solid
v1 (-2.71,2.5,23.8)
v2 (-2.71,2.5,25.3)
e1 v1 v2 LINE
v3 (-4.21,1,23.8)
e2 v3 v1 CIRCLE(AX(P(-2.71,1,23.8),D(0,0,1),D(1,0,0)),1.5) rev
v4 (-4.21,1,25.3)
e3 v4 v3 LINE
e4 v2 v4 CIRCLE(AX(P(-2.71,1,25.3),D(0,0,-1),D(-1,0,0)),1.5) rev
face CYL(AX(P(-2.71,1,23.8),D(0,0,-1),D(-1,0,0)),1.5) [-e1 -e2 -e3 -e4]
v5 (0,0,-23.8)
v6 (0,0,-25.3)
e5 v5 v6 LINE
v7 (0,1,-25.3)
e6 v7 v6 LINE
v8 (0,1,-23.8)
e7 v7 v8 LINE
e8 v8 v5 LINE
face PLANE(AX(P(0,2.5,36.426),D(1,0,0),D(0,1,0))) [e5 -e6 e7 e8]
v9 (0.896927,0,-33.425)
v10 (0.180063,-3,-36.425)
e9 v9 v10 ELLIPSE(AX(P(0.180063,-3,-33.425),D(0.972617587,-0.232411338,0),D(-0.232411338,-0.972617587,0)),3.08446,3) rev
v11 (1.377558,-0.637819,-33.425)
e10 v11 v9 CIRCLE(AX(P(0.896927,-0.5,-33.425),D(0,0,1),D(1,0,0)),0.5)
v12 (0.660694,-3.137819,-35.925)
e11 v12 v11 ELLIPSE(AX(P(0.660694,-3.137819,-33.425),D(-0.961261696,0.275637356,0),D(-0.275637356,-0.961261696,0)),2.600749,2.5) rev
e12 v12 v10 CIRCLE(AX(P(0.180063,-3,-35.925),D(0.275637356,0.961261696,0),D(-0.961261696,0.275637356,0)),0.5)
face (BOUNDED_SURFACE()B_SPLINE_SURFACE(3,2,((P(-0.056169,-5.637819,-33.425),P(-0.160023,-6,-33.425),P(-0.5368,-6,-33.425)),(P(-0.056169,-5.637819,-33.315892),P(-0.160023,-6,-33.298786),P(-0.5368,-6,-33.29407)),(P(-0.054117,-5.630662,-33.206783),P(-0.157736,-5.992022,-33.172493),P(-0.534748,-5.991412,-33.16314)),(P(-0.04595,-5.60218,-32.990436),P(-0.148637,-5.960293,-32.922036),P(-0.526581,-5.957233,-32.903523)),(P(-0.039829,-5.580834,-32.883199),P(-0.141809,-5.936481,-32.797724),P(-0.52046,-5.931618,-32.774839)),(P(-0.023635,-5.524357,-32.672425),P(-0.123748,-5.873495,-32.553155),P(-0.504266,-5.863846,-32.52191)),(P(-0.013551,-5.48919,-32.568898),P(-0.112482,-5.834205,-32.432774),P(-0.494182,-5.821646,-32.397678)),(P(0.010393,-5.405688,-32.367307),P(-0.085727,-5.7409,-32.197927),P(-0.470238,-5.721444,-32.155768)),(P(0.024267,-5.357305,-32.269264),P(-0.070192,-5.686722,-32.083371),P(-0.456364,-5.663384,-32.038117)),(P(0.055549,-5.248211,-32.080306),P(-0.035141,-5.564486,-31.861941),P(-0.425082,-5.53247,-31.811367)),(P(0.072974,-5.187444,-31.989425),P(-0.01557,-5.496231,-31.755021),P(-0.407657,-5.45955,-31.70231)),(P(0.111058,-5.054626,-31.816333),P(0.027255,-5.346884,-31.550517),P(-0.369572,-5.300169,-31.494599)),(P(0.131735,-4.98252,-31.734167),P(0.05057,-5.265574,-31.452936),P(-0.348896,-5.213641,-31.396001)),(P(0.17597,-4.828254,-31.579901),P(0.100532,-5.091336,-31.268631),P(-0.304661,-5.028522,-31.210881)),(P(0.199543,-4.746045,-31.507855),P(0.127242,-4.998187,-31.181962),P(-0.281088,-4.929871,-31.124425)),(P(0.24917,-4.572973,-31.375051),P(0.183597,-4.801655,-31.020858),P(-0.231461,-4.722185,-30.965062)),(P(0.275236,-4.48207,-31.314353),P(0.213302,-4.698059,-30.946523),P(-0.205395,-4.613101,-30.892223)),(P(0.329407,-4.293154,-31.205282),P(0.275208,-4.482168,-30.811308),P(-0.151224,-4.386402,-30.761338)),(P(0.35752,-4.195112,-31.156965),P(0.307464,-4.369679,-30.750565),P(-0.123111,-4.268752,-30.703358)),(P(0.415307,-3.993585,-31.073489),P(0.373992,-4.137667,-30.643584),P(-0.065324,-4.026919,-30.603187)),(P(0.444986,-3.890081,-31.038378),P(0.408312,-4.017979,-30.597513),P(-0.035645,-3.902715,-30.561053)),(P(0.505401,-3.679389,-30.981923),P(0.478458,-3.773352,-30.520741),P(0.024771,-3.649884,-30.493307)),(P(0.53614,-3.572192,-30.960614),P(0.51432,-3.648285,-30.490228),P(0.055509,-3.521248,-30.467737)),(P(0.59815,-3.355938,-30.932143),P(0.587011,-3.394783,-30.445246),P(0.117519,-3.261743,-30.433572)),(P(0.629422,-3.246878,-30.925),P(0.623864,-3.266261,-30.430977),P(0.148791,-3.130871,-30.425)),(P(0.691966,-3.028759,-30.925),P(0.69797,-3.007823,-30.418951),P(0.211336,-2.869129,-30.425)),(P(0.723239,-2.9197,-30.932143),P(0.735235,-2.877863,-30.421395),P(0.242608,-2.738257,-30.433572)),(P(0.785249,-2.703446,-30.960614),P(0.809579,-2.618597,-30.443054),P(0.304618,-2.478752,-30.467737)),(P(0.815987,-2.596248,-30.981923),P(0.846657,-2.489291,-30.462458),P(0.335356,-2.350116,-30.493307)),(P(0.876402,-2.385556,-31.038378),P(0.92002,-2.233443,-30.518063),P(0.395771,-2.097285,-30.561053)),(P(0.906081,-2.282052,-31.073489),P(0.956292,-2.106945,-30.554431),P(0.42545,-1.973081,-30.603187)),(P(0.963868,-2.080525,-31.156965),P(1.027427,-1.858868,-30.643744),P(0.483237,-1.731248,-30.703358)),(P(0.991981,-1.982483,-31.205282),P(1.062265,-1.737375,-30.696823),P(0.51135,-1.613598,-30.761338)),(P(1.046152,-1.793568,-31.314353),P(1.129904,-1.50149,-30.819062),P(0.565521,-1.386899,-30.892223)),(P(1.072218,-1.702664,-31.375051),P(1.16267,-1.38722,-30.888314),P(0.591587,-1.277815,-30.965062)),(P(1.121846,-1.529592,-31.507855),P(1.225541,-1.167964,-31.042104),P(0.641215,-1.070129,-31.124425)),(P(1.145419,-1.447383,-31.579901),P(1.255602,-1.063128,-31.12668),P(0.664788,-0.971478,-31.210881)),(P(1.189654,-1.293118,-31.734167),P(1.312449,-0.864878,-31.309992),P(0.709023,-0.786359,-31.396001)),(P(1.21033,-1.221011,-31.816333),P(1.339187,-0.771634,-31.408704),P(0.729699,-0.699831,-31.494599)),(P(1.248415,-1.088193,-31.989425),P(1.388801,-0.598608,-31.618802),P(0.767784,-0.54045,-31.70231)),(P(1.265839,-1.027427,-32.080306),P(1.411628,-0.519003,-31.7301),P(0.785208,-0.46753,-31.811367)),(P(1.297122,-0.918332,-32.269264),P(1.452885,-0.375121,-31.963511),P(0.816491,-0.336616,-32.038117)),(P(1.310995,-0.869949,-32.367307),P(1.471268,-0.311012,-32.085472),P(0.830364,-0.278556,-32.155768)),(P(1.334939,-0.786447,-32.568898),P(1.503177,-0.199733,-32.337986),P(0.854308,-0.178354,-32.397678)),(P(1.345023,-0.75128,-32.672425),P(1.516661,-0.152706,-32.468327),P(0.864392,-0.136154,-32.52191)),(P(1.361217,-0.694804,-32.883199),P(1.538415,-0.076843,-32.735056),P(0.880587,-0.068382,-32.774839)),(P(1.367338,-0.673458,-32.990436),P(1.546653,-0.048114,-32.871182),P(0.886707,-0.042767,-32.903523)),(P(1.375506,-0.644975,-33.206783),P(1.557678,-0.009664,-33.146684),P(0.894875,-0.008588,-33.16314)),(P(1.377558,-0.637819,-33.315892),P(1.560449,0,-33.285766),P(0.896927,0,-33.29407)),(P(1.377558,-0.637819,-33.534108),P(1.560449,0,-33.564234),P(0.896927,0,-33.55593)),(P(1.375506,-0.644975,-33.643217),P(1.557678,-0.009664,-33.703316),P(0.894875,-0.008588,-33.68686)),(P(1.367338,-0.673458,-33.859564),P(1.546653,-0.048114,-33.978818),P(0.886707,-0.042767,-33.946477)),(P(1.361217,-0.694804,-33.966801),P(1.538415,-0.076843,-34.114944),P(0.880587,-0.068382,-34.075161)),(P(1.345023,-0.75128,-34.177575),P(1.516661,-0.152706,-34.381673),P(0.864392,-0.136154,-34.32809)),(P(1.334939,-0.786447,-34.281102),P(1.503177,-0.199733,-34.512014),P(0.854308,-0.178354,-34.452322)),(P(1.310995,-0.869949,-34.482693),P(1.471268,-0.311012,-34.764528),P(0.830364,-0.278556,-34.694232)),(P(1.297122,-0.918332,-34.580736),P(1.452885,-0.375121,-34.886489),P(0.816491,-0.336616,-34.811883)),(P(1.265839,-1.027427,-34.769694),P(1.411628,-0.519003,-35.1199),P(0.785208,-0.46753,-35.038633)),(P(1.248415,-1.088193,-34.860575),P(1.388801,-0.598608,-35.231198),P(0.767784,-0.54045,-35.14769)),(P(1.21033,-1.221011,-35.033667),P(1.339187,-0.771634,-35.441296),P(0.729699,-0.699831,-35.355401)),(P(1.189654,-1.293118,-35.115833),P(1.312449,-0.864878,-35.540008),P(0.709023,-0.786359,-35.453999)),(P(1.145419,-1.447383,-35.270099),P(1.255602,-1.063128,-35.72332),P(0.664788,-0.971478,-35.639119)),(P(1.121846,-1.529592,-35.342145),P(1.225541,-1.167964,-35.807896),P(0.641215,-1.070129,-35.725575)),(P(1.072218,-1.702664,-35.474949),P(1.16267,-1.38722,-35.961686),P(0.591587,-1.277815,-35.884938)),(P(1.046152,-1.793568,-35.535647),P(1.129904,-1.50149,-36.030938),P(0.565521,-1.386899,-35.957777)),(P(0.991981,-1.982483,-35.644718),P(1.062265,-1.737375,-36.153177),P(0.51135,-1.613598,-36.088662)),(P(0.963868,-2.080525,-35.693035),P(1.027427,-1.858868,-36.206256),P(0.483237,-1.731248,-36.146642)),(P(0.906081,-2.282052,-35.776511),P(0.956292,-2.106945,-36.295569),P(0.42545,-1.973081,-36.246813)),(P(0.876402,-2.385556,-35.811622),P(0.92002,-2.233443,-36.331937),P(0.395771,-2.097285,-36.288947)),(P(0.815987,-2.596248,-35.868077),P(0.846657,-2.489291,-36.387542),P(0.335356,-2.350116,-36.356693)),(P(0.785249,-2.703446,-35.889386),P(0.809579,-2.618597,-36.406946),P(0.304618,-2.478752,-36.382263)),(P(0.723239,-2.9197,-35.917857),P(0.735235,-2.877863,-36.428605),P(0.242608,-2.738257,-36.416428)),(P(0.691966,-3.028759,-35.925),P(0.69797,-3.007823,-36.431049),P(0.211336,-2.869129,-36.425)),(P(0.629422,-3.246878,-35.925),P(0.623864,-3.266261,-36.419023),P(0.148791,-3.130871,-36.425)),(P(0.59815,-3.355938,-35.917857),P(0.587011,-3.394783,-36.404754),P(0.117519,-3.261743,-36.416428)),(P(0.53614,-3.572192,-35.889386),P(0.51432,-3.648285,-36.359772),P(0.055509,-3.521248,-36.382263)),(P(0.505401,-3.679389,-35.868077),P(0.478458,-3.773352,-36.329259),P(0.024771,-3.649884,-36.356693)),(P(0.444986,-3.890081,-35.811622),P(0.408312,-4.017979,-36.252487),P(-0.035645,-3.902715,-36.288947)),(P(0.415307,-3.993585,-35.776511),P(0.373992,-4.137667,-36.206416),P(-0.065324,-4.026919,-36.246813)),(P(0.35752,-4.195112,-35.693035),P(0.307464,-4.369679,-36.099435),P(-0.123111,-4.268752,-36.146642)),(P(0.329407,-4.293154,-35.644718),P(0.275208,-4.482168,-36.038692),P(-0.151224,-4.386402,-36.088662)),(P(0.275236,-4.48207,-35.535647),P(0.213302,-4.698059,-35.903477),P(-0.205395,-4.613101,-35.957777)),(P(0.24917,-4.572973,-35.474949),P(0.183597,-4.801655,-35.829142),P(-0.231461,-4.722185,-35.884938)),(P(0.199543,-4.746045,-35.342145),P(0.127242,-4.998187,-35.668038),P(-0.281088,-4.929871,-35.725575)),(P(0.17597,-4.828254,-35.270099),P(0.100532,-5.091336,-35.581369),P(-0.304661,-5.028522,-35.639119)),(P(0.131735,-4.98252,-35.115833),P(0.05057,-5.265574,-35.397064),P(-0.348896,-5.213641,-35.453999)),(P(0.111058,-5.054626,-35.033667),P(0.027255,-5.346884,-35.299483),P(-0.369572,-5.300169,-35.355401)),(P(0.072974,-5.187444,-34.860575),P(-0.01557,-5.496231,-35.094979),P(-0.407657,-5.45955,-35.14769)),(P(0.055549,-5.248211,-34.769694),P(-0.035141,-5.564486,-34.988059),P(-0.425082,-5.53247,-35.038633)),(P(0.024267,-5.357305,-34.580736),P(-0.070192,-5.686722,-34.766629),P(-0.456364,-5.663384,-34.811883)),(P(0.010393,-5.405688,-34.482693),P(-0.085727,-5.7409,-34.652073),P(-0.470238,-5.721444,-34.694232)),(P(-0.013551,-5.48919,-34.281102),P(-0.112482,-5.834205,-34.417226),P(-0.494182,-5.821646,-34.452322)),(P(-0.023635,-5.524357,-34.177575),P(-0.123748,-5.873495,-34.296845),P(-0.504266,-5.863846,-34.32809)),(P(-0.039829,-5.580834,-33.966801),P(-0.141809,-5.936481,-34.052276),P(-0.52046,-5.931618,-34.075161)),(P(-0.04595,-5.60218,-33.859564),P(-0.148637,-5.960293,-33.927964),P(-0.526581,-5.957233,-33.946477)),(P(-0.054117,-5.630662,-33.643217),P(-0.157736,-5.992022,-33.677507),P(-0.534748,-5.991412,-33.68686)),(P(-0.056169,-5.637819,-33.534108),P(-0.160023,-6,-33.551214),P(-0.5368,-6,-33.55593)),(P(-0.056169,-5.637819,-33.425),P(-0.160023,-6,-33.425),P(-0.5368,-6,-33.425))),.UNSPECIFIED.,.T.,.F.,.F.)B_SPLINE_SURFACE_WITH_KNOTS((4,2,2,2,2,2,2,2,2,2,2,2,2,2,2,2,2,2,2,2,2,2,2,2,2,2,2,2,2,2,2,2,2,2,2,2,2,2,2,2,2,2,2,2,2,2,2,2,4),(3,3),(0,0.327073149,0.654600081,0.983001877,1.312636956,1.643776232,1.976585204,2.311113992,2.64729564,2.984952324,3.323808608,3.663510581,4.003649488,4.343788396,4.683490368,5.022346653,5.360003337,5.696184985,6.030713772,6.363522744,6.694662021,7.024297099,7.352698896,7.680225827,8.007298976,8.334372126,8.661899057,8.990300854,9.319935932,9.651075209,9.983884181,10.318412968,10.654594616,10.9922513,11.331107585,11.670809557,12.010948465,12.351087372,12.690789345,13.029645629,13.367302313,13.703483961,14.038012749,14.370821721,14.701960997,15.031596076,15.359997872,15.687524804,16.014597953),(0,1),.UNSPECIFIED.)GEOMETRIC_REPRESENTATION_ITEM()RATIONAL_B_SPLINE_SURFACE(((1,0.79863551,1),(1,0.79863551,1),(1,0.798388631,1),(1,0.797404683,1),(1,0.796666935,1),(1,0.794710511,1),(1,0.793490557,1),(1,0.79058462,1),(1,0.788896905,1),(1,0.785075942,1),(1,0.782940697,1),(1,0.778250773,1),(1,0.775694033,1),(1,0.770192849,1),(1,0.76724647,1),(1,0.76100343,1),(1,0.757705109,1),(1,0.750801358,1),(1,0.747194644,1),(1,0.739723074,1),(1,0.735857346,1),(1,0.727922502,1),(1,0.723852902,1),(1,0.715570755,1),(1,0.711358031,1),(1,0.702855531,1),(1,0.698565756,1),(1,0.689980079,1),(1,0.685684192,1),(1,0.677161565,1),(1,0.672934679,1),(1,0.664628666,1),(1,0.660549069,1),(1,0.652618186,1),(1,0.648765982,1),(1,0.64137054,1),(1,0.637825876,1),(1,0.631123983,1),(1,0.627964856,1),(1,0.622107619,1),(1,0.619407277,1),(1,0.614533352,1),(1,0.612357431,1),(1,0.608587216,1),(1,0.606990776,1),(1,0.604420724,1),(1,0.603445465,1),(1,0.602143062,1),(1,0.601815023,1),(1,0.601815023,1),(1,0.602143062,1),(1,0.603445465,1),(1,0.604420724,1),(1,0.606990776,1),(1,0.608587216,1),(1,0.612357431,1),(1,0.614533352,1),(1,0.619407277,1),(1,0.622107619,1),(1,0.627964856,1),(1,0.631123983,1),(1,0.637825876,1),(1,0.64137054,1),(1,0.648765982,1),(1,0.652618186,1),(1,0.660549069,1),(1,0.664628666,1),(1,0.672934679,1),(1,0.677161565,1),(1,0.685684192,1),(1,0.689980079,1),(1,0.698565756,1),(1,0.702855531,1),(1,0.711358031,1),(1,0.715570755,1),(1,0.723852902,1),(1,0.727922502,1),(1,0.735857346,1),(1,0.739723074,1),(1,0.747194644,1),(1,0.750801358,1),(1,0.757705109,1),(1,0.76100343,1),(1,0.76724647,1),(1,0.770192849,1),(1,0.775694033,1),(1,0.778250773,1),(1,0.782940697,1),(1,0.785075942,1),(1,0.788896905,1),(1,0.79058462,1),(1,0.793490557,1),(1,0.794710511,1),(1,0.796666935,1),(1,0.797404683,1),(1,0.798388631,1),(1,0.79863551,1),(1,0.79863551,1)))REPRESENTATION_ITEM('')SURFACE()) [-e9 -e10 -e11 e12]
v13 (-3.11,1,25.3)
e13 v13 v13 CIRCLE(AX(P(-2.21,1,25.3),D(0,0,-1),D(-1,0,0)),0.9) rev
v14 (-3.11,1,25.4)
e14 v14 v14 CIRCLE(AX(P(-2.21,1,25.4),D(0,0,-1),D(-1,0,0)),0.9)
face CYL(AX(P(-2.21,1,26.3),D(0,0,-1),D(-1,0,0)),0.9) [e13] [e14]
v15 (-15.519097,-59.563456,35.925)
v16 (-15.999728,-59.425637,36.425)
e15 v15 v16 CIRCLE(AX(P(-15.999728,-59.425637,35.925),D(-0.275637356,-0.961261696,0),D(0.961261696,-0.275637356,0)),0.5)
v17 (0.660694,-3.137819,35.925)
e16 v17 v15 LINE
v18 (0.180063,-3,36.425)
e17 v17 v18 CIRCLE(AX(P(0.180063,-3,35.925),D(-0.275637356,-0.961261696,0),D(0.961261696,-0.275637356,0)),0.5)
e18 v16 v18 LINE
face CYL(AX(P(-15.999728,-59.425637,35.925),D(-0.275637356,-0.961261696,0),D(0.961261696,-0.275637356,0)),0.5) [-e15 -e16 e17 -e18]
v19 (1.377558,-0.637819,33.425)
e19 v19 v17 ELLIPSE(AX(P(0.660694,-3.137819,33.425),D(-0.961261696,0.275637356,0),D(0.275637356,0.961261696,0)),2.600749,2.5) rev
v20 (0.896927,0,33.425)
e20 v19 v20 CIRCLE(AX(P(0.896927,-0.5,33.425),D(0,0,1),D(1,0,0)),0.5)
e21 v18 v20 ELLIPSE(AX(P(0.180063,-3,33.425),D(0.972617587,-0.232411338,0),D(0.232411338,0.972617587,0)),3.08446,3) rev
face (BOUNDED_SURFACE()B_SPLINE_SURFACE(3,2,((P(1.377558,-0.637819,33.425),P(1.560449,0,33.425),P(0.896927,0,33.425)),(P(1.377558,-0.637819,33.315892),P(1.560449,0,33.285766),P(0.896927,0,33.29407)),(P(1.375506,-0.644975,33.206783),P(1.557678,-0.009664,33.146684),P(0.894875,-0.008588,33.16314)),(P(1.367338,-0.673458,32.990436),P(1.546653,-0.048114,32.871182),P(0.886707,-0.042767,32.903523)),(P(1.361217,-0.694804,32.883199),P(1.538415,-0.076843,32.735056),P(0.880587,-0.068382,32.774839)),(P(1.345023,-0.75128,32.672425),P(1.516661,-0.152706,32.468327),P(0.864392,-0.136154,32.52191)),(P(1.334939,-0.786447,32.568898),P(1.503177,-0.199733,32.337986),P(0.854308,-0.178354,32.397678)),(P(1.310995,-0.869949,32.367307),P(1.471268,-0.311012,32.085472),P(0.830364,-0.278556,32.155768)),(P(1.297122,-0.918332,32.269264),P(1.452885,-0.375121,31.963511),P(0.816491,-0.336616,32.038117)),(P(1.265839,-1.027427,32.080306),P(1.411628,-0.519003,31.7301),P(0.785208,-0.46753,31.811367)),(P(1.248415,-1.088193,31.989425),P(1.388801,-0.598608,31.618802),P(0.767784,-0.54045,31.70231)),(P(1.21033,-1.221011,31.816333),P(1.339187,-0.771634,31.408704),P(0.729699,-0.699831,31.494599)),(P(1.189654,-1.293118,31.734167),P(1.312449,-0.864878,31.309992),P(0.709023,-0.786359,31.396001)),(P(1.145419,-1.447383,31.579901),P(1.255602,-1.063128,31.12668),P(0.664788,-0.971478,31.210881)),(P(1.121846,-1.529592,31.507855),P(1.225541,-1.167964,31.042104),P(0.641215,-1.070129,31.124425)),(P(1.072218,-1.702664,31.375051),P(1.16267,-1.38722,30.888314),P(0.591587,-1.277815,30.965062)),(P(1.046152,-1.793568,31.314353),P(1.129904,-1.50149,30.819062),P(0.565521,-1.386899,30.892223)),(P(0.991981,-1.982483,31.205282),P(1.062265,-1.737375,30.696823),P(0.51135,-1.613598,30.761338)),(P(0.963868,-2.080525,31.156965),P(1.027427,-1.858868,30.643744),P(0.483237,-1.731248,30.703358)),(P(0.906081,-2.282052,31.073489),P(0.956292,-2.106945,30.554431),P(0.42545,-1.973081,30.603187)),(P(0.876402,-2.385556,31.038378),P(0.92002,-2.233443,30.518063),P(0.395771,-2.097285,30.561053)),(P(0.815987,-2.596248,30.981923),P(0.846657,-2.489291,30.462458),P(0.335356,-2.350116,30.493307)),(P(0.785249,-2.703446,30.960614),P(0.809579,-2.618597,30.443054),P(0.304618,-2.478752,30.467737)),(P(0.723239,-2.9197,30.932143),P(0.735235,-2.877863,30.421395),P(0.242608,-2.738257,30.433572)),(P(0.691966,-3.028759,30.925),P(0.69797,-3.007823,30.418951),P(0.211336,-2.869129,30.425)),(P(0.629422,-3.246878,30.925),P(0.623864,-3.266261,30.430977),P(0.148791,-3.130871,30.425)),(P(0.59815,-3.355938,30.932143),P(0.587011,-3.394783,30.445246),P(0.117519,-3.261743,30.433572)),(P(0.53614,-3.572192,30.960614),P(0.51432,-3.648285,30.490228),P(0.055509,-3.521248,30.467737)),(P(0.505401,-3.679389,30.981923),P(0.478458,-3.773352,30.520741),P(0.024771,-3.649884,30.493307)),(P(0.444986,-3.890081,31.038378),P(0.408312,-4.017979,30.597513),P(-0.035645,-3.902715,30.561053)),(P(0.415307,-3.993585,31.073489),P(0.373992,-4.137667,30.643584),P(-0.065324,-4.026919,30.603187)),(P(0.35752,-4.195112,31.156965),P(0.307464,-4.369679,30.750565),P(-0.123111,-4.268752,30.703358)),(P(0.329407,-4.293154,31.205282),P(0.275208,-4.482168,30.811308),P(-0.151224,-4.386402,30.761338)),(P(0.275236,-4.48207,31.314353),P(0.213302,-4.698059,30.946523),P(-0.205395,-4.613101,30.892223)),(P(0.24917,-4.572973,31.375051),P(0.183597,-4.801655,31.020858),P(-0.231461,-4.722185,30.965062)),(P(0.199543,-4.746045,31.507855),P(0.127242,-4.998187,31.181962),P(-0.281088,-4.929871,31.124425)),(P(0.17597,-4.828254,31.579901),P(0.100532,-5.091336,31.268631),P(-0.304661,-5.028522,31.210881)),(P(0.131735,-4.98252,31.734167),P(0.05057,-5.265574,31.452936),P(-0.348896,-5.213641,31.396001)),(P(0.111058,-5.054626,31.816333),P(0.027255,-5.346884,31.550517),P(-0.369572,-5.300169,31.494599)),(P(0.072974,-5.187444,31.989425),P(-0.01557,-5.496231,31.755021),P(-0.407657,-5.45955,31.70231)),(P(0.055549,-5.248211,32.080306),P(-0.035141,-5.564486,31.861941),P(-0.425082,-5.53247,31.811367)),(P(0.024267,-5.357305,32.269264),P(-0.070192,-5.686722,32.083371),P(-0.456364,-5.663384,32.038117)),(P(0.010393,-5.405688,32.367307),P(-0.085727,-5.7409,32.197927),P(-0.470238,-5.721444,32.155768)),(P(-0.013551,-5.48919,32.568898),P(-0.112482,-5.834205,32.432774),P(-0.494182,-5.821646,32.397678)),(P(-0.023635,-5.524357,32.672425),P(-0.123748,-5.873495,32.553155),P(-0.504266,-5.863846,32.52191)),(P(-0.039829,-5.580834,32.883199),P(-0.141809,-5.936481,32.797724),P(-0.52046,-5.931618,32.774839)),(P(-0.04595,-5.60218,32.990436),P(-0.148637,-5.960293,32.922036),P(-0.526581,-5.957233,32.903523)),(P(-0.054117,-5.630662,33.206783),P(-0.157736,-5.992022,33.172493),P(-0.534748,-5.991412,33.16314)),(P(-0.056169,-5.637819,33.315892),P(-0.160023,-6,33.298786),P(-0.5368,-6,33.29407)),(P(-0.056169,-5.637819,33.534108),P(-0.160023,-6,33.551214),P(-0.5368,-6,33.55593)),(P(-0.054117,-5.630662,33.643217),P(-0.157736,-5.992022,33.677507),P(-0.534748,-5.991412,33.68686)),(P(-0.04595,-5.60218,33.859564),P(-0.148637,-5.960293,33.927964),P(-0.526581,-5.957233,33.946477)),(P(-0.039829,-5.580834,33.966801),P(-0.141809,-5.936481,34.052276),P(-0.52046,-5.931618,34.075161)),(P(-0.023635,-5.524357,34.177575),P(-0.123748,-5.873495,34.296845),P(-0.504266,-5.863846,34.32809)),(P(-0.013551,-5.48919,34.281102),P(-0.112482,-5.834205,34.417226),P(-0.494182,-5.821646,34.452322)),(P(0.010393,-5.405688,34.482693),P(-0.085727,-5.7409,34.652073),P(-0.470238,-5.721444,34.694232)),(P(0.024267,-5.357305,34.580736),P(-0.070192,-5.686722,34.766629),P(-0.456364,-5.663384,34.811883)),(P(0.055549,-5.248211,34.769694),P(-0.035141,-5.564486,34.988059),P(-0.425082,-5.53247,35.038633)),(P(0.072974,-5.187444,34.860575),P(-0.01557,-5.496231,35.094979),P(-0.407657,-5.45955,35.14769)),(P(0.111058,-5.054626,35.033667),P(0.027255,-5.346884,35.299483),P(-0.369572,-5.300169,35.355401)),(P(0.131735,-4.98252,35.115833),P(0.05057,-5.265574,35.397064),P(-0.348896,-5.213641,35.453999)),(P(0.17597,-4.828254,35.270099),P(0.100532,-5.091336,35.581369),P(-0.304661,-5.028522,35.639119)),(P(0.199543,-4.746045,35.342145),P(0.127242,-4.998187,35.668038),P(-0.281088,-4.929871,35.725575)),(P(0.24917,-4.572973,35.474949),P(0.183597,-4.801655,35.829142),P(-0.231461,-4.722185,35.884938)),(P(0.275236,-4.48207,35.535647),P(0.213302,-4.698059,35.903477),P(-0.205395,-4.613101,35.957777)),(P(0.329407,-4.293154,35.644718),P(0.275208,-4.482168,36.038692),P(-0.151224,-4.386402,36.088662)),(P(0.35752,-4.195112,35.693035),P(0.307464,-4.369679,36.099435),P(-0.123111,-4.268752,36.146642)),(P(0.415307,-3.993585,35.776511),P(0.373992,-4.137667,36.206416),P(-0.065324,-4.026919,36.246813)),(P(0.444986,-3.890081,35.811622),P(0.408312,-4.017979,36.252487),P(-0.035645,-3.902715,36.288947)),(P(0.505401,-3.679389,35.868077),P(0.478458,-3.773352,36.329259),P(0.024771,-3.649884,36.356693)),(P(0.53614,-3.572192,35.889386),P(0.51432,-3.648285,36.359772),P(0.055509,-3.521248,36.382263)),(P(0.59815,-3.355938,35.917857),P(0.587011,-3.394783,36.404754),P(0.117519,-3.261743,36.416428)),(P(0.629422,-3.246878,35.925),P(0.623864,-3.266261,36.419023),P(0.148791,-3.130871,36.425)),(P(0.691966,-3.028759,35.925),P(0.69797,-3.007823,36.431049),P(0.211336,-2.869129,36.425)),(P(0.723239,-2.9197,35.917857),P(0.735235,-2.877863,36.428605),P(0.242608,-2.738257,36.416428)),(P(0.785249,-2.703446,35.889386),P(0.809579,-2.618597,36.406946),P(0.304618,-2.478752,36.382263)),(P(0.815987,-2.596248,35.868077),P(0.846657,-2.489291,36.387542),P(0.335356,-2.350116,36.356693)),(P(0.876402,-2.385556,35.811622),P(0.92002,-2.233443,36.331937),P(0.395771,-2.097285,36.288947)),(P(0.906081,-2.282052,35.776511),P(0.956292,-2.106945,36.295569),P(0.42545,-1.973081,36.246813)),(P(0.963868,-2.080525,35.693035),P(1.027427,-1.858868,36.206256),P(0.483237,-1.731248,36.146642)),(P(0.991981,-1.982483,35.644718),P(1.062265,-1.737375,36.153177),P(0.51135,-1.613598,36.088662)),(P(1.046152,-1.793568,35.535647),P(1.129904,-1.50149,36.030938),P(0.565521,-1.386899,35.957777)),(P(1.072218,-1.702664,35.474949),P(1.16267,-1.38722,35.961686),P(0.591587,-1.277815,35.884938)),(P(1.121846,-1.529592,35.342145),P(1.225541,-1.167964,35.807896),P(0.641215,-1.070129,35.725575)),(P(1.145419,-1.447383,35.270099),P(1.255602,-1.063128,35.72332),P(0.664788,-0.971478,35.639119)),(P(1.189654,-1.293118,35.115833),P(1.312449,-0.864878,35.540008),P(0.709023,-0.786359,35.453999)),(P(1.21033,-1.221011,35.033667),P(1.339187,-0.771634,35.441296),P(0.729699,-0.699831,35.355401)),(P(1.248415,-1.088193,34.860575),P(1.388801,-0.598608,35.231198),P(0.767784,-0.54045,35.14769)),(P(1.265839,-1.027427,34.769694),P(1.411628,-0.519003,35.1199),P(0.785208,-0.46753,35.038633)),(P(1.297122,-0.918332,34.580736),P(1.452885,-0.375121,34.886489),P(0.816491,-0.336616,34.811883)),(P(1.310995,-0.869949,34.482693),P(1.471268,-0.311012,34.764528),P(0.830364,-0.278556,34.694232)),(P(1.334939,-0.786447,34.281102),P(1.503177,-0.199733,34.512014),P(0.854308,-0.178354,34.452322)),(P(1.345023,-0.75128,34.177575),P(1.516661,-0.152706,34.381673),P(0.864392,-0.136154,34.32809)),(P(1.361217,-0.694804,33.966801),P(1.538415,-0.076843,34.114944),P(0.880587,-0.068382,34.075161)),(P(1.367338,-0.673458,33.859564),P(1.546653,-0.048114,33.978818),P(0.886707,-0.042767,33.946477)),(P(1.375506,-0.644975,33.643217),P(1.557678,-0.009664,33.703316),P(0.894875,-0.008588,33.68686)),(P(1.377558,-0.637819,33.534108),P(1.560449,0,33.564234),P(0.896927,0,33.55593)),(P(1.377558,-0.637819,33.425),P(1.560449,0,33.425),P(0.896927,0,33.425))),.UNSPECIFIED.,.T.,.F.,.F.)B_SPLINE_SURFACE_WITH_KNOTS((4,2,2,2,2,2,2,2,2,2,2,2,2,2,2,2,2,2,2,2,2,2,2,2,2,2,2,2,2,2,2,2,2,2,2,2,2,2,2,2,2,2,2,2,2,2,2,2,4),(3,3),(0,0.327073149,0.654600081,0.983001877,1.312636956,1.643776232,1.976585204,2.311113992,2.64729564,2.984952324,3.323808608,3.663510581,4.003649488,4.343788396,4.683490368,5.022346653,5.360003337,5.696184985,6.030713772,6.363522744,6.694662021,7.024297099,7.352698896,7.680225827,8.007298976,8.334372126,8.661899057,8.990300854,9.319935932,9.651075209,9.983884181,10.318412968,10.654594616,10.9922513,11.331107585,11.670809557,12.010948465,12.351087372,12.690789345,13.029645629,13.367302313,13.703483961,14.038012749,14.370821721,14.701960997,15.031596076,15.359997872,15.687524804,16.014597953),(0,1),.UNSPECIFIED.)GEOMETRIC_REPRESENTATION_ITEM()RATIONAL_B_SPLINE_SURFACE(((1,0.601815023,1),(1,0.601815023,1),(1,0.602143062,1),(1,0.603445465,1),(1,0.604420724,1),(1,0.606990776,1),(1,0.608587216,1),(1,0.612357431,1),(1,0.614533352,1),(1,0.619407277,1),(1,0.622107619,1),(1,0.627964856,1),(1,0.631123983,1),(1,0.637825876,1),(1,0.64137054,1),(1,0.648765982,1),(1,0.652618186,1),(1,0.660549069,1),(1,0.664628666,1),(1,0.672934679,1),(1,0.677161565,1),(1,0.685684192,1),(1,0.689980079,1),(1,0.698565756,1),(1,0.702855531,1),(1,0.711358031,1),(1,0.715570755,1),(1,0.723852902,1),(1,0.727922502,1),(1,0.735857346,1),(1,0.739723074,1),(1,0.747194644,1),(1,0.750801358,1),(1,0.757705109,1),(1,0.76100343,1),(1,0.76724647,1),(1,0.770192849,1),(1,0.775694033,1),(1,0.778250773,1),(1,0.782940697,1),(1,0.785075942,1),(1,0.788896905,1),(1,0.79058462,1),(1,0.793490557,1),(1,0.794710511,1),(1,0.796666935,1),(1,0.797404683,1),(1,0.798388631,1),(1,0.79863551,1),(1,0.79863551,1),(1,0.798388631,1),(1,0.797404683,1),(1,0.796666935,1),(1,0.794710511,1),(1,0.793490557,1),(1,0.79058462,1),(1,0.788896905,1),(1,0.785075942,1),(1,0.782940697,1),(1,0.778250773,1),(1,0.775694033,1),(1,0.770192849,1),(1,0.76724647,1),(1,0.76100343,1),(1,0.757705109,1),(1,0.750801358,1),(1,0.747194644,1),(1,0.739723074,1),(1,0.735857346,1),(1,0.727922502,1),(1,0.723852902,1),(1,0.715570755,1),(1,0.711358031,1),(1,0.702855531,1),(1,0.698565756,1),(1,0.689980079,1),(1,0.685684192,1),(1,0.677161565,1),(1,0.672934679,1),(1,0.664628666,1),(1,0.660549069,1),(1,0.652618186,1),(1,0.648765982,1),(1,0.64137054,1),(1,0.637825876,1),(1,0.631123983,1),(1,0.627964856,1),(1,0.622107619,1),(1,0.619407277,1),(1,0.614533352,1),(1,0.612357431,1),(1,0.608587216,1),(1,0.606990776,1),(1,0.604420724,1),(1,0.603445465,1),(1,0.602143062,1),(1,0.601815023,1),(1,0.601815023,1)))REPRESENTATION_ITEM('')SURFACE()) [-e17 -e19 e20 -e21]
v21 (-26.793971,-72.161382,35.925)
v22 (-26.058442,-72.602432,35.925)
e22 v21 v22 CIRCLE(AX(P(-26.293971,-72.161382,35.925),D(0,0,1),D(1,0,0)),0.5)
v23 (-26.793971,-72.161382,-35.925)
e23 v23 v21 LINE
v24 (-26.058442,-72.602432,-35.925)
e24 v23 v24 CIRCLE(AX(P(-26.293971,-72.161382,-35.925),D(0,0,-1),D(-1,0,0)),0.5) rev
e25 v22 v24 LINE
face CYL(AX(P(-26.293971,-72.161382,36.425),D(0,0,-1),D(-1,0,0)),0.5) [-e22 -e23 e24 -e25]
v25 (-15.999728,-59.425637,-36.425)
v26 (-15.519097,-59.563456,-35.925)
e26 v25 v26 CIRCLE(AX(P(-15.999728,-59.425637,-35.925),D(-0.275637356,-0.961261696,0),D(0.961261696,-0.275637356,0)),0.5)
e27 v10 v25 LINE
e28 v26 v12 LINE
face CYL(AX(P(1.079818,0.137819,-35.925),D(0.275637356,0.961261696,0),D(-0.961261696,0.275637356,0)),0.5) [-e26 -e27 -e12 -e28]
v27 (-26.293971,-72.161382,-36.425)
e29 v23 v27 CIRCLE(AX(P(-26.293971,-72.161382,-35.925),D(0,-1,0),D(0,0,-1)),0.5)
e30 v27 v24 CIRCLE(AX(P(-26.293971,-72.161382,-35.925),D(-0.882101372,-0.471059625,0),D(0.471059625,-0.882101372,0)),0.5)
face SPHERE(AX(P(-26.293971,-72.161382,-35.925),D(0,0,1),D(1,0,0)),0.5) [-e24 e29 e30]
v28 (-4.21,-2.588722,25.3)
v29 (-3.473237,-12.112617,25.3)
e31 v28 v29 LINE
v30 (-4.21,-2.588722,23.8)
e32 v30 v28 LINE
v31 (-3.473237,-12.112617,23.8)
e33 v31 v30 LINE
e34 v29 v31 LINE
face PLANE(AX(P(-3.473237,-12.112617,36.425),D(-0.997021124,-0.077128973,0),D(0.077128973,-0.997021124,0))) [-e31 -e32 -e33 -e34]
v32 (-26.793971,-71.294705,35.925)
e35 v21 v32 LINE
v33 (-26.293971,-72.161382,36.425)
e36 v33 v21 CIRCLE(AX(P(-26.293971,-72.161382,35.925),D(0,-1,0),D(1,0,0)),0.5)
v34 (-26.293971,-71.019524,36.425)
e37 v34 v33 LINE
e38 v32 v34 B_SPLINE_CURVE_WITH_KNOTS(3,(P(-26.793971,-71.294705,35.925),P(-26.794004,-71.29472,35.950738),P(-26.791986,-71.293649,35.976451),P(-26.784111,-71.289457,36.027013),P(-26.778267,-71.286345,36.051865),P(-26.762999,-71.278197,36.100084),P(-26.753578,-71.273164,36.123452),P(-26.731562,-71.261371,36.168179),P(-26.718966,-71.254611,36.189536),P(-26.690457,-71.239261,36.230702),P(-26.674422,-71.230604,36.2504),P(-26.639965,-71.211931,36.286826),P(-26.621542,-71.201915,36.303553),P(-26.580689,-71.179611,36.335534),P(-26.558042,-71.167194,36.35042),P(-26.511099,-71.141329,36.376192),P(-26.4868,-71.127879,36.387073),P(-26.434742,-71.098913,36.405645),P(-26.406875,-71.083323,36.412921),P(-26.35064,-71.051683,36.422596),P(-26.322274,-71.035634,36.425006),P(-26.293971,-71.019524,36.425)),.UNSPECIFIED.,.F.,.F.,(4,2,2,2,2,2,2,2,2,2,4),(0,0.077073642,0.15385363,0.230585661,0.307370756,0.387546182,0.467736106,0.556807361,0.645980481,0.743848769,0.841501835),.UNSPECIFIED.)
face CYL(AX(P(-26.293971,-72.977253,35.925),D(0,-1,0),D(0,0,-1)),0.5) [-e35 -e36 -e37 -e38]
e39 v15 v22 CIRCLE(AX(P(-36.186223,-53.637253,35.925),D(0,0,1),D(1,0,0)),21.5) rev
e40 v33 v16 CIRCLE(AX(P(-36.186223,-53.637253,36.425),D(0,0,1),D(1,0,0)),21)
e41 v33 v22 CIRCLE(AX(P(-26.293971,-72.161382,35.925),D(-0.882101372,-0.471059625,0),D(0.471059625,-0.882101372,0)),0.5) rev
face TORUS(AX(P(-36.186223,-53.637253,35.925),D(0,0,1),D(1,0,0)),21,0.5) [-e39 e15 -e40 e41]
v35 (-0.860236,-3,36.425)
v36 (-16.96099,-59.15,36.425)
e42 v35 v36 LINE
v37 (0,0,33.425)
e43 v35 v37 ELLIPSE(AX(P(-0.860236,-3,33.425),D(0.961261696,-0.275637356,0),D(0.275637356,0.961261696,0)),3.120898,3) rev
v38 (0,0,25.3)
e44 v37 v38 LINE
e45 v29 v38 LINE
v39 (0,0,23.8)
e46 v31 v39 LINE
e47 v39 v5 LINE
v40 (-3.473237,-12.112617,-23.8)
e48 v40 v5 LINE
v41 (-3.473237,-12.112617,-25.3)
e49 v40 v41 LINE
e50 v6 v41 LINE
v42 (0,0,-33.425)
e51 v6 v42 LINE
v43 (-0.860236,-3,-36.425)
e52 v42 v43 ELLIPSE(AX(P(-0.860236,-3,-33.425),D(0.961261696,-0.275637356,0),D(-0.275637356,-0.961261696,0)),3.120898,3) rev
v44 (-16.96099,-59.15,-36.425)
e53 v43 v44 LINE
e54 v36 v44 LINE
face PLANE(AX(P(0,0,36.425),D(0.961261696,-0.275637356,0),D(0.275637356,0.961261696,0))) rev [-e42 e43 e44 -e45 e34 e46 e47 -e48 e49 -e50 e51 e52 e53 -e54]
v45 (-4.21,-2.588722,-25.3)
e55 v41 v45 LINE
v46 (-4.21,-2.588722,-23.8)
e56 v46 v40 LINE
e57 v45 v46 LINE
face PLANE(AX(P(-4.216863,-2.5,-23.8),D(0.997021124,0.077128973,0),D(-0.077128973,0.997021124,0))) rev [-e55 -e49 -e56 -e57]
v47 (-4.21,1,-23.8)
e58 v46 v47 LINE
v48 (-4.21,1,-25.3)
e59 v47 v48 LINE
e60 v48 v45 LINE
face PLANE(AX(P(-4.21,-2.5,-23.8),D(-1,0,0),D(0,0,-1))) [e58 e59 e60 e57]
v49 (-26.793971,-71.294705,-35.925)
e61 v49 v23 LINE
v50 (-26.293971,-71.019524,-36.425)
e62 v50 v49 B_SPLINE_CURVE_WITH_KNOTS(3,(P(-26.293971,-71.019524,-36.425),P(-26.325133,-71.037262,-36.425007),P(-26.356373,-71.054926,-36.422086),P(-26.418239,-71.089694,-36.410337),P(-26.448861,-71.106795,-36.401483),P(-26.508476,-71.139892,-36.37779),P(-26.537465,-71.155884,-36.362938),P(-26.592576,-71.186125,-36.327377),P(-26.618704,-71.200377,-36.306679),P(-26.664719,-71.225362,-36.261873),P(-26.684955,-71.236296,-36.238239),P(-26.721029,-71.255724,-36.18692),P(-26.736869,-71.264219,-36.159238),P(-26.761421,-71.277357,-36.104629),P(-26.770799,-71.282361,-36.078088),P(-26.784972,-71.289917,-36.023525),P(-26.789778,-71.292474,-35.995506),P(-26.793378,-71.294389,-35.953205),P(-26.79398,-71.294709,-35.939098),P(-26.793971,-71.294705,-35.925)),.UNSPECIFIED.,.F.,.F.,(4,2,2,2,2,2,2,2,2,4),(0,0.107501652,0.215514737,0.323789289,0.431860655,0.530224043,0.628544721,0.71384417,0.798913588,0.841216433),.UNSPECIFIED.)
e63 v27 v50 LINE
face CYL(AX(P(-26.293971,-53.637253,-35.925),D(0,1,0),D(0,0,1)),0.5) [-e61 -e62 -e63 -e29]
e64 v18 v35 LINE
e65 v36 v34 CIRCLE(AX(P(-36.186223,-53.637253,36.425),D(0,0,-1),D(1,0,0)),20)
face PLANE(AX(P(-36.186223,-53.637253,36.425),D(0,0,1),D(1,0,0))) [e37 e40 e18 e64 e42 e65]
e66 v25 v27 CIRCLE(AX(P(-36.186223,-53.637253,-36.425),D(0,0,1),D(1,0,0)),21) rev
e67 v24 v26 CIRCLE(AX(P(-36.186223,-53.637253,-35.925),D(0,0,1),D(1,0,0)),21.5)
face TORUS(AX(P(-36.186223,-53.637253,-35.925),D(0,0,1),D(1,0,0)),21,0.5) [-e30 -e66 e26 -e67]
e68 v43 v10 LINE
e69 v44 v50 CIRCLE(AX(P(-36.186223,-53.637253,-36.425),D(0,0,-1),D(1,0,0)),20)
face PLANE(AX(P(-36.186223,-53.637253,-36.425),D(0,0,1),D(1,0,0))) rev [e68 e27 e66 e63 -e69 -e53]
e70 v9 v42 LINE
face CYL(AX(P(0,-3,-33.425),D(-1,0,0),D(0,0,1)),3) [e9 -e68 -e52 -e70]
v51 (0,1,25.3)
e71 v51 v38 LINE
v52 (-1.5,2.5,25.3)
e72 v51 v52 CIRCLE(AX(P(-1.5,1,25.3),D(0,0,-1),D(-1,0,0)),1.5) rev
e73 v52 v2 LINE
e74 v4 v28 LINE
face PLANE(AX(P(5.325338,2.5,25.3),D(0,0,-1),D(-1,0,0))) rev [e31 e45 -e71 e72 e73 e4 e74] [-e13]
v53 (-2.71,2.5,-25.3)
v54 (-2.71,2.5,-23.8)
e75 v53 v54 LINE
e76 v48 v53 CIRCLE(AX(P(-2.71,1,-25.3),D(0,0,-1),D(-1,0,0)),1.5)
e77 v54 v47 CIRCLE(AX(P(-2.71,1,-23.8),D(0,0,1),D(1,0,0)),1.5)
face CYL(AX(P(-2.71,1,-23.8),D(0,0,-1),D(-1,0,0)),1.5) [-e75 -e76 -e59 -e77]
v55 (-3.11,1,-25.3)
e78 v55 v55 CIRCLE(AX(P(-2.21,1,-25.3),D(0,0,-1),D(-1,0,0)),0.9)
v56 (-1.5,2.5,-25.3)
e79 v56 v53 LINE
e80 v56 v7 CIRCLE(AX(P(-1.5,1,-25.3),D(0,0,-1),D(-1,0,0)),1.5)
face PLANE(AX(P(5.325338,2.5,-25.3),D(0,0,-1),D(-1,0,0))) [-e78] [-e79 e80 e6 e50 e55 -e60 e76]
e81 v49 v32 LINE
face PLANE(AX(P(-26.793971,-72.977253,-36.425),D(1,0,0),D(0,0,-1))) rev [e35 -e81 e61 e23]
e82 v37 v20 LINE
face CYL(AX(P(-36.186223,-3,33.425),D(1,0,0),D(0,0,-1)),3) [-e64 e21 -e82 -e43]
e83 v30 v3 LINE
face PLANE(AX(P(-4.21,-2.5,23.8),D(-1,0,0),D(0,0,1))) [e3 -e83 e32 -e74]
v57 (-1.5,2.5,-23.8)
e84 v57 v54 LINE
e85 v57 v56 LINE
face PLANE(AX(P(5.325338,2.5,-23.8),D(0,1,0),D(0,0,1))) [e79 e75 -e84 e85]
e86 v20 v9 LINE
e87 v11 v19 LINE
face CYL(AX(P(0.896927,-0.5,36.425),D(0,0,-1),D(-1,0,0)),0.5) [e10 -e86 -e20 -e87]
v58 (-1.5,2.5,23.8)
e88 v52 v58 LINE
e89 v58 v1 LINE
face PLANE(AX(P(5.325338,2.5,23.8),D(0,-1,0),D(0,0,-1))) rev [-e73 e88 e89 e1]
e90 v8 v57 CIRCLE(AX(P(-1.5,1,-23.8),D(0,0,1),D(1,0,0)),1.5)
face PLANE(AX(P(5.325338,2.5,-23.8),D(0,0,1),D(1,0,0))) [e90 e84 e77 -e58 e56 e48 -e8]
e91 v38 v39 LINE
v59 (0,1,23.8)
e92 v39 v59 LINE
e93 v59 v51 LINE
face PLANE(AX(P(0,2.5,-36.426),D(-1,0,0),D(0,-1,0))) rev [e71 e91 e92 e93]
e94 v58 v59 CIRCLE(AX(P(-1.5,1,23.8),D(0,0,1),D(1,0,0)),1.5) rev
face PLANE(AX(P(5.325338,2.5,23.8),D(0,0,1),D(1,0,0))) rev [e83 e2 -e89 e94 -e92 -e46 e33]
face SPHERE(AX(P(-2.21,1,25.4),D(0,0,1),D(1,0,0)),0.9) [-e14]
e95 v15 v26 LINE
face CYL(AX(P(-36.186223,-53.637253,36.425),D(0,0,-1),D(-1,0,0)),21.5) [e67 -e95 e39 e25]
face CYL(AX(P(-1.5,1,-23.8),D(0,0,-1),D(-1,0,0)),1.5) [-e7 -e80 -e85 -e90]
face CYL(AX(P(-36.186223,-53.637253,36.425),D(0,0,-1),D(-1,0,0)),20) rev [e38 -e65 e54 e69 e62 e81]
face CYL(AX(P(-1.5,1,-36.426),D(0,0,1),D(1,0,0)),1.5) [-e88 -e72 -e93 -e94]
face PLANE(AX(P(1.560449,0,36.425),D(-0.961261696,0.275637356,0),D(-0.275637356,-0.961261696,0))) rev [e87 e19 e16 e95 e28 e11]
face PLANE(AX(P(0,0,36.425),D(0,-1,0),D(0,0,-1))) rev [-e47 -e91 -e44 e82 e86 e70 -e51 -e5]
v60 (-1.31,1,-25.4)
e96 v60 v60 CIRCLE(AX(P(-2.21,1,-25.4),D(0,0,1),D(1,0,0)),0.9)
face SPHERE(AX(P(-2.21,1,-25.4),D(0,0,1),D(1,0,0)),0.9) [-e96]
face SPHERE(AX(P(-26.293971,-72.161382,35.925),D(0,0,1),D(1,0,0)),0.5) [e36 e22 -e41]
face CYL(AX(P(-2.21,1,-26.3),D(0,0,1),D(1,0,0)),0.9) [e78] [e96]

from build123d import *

# Parameters (mm, degrees)
BOSS_EXTRUDE1_DEPTH   = 36.425
CUT_EXTRUDE1_DEPTH    = 109.688749553
CUT_EXTRUDE2_DEPTH    = 108.700665357
FILLET1_R             = 3
BOSS_EXTRUDE12_REACH  = 92.061
BOSS_EXTRUDE12_START  = -4.21
SKETCH27_W            = 1.5
SKETCH27_H            = 5
CUT_EXTRUDE9_REACH    = 101.265
SKETCH30_W            = 0.716863464
SKETCH30_H            = 2.5
SKETCH31_R            = 0.9
BOSS_EXTRUDE13_DEPTH  = 1
FILLET9_R             = 1.5
FILLET10_R            = 1.5
FILLET11_R            = 0.9
FILLET9_OF_MIRROR4_R  = 1.5
FILLET10_OF_MIRROR4_R = 1.5
FILLET11_OF_MIRROR4_R = 0.9
FILLET12_R            = 0.5


with BuildPart() as part:
    # Sketch1 → Boss-Extrude1 (new, symmetric)
    with BuildSketch(Plane.XY):
        with BuildLine():
            Line((0, 0), (-16.960989568, -59.15))
            ThreePointArc((-16.960989568, -59.15), (-22.197903753, -67.931549335), (-31.090696036, -72.977252884))
            Line((-31.090696036, -72.977252884), (-30.708531477, -74.427752884))
            ThreePointArc((-30.708531477, -74.427752884), (-21.148779773, -69.003621568), (-15.519097024, -59.563456034))
            Line((-15.519097024, -59.563456034), (1.441892544, -0.413456034))
            Line((1.441892544, -0.413456034), (1.560449154, 0))
            Line((1.560449154, 0), (0, 0))
        make_face()
    extrude(amount=BOSS_EXTRUDE1_DEPTH, both=True)

    # Sketch2 → Cut-Extrude1 (cut, through all)
    with BuildSketch(Plane.XY.offset(36.425)):
        with BuildLine():
            Line((-31.090696036, -72.977252884), (-26.79397136, -72.977252884))
            ThreePointArc((-26.79397136, -72.977252884), (-28.715962633, -73.797739058), (-30.708531477, -74.427752884))
            Line((-30.708531477, -74.427752884), (-31.090696036, -72.977252884))
        make_face()
    extrude(amount=-CUT_EXTRUDE1_DEPTH, mode=Mode.SUBTRACT)

    # Sketch3 → Cut-Extrude2 (cut, through all)
    with BuildSketch(Plane.XY.offset(36.425)):
        with BuildLine():
            Line((-26.79397136, -72.977252884), (-31.090696036, -72.977252884))
            ThreePointArc((-31.090696036, -72.977252884), (-28.893646337, -72.260311669), (-26.79397136, -71.294704568))
            Line((-26.79397136, -71.294704568), (-26.79397136, -72.977252884))
        make_face()
    extrude(amount=-CUT_EXTRUDE2_DEPTH, mode=Mode.SUBTRACT)

    # Fillet1
    fillet1_edges = [part.edges().sort_by_distance(p)[0] for p in [
        (0.780224577, 0, 36.425),
        (0.780224577, 0, -36.425),
    ]]
    fillet(fillet1_edges, radius=FILLET1_R)

    # Boss-Extrude12: up to this plane
    boss_extrude12_end = Plane(origin=(0, 0, 36.425), z_dir=(0.961261695938318, -0.27563735581700266, 0))
    # Sketch27 → Boss-Extrude12 (add, up to the surface)
    with BuildSketch(Plane(origin=(0, 0, 0), x_dir=(0, 0, -1), z_dir=(1, 0, 0)).offset(BOSS_EXTRUDE12_START), mode=Mode.PRIVATE) as boss_extrude12_sk1:
        with Locations((-24.55, 0)):
            Rectangle(SKETCH27_W, SKETCH27_H)
    boss_extrude12_tool1 = split(extrude(boss_extrude12_sk1.sketch, amount=BOSS_EXTRUDE12_REACH, mode=Mode.PRIVATE), bisect_by=boss_extrude12_end, keep=Keep.BOTH, mode=Mode.PRIVATE)
    boss_extrude12 = boss_extrude12_tool1.solids().sort_by_distance((-4.21, 0, 24.55))[0]
    add(boss_extrude12)

    # Sketch30 → Cut-Extrude9 (cut, up to next)
    with BuildSketch(Plane.XY.offset(25.3), mode=Mode.PRIVATE) as cut_extrude9_sk1:
        with Locations((0.358431732, 1.25)):
            Rectangle(SKETCH30_W, SKETCH30_H)
    cut_extrude9_tool1 = extrude(cut_extrude9_sk1.sketch, amount=-CUT_EXTRUDE9_REACH, mode=Mode.PRIVATE) & part.part
    cut_extrude9 = cut_extrude9_tool1.solids().sort_by_distance((0.358432, 1.25, 25.3))[0]
    add(cut_extrude9, mode=Mode.SUBTRACT)

    # Sketch31 → Boss-Extrude13 (add)
    with BuildSketch(Plane.XY.offset(25.3)):
        with Locations(Location((-2.21, 1, 0), (0, 0, 180))):
            Circle(SKETCH31_R)
    boss_extrude13 = extrude(amount=BOSS_EXTRUDE13_DEPTH)

    # Fillet9
    fillet9_edges = [part.edges().sort_by_distance(p)[0] for p in [
        (-4.21, 2.5, 24.55),
    ]]
    fillet(fillet9_edges, radius=FILLET9_R)

    # Fillet10
    fillet10_edges = [part.edges().sort_by_distance(p)[0] for p in [
        (0, 2.5, 24.55),
    ]]
    fillet(fillet10_edges, radius=FILLET10_R)

    # Fillet11
    fillet11_edges = [part.edges().sort_by_distance(p)[0] for p in [
        (-1.31, 1, 26.3),
    ]]
    fillet(fillet11_edges, radius=FILLET11_R)

    # Mirror4: Boss-Extrude12, Cut-Extrude9, Boss-Extrude13 across plane
    add(boss_extrude12.mirror(Plane.XY))
    add(cut_extrude9.mirror(Plane.XY), mode=Mode.SUBTRACT)
    add(boss_extrude13.mirror(Plane.XY))

    # Fillet9 of Mirror4
    fillet9_of_mirror4_edges = [part.edges().sort_by_distance(p)[0] for p in [
        (-4.21, 2.5, -24.55),
    ]]
    fillet(fillet9_of_mirror4_edges, radius=FILLET9_OF_MIRROR4_R)

    # Fillet10 of Mirror4
    fillet10_of_mirror4_edges = [part.edges().sort_by_distance(p)[0] for p in [
        (0, 2.5, -24.55),
    ]]
    fillet(fillet10_of_mirror4_edges, radius=FILLET10_OF_MIRROR4_R)

    # Fillet11 of Mirror4
    fillet11_of_mirror4_edges = [part.edges().sort_by_distance(p)[0] for p in [
        (-1.31, 1, -26.3),
    ]]
    fillet(fillet11_of_mirror4_edges, radius=FILLET11_OF_MIRROR4_R)

    # Fillet12
    fillet12_edges = [part.edges().sort_by_distance(p)[0] for p in [
        (-7.409442014, -31.281728017, 36.425),
        (-19.727971855, -67.471122669, -36.425),
        (-19.727971855, -67.471122669, 36.425),
        (-26.79397136, -72.977252884, 0),
        (-26.79397136, -72.135978726, -36.425),
        (-26.79397136, -72.135978726, 36.425),
        (1.560449154, 0, 0),
        (1.302457732, -0.899723012, 35.567156991),
        (1.302457732, -0.899723012, -35.567156991),
        (-7.409442014, -31.281728017, -36.425),
    ]]
    fillet(fillet12_edges, radius=FILLET12_R)

    # Chamfer1
    # the kernel refuses this chamfer: 10, 3.5 mm, written as the material it adds along each edge
    with BuildSketch(Plane(origin=(-0.716863464, -2.5, 25.3), x_dir=(-0.26268080042718933, -0.9648827892997839, 0), z_dir=(0, 0, -1))) as chamfer1_piece_1_section:
        with BuildLine():
            Line((10.375794366, 0), (0.542683512, 3.511617253))
            Line((0.542683512, 3.511617253), (0.349706955, 3.564153413))
            ThreePointArc((0.349706955, 3.564153413), (0.270766903, 1.755965125), (-0.192976558, 0.05253616))
            Line((-0.192976558, 0.05253616), (0.00269055, -0.199981902))
            ThreePointArc((0.00269055, -0.199981902), (5.189648845, -0.130196738), (10.378484916, -0.199981902))
            Line((10.378484916, -0.199981902), (10.375794366, 0))
        make_face()
    chamfer1_piece_1 = extrude(amount=1.5, mode=Mode.PRIVATE)
    chamfer1_piece_1 = split(chamfer1_piece_1, bisect_by=Plane(origin=(-4.21, -5.808119571, 24.55), z_dir=(1, 0, 0)), keep=Keep.TOP, mode=Mode.PRIVATE)
    add(chamfer1_piece_1)
    with BuildSketch(Plane(origin=(-0.716863464, -2.5, -25.3), x_dir=(-0.26268080042718933, -0.9648827892997839, 0), z_dir=(0, 0, 1))) as chamfer1_piece_2_section:
        with BuildLine():
            Line((10.375794366, 0), (0.542683512, -3.511617253))
            Line((0.542683512, -3.511617253), (0.349706955, -3.564153413))
            ThreePointArc((0.349706955, -3.564153413), (0.270766903, -1.755965125), (-0.192976558, -0.05253616))
            Line((-0.192976558, -0.05253616), (0.00269055, 0.199981902))
            ThreePointArc((0.00269055, 0.199981902), (5.189648845, 0.130196738), (10.378484916, 0.199981902))
            Line((10.378484916, 0.199981902), (10.375794366, 0))
        make_face()
    chamfer1_piece_2 = extrude(amount=1.5, mode=Mode.PRIVATE)
    chamfer1_piece_2 = split(chamfer1_piece_2, bisect_by=Plane(origin=(-4.21, -5.808119571, -24.55), z_dir=(1, 0, 0)), keep=Keep.TOP, mode=Mode.PRIVATE)
    add(chamfer1_piece_2)


solid = part.part
